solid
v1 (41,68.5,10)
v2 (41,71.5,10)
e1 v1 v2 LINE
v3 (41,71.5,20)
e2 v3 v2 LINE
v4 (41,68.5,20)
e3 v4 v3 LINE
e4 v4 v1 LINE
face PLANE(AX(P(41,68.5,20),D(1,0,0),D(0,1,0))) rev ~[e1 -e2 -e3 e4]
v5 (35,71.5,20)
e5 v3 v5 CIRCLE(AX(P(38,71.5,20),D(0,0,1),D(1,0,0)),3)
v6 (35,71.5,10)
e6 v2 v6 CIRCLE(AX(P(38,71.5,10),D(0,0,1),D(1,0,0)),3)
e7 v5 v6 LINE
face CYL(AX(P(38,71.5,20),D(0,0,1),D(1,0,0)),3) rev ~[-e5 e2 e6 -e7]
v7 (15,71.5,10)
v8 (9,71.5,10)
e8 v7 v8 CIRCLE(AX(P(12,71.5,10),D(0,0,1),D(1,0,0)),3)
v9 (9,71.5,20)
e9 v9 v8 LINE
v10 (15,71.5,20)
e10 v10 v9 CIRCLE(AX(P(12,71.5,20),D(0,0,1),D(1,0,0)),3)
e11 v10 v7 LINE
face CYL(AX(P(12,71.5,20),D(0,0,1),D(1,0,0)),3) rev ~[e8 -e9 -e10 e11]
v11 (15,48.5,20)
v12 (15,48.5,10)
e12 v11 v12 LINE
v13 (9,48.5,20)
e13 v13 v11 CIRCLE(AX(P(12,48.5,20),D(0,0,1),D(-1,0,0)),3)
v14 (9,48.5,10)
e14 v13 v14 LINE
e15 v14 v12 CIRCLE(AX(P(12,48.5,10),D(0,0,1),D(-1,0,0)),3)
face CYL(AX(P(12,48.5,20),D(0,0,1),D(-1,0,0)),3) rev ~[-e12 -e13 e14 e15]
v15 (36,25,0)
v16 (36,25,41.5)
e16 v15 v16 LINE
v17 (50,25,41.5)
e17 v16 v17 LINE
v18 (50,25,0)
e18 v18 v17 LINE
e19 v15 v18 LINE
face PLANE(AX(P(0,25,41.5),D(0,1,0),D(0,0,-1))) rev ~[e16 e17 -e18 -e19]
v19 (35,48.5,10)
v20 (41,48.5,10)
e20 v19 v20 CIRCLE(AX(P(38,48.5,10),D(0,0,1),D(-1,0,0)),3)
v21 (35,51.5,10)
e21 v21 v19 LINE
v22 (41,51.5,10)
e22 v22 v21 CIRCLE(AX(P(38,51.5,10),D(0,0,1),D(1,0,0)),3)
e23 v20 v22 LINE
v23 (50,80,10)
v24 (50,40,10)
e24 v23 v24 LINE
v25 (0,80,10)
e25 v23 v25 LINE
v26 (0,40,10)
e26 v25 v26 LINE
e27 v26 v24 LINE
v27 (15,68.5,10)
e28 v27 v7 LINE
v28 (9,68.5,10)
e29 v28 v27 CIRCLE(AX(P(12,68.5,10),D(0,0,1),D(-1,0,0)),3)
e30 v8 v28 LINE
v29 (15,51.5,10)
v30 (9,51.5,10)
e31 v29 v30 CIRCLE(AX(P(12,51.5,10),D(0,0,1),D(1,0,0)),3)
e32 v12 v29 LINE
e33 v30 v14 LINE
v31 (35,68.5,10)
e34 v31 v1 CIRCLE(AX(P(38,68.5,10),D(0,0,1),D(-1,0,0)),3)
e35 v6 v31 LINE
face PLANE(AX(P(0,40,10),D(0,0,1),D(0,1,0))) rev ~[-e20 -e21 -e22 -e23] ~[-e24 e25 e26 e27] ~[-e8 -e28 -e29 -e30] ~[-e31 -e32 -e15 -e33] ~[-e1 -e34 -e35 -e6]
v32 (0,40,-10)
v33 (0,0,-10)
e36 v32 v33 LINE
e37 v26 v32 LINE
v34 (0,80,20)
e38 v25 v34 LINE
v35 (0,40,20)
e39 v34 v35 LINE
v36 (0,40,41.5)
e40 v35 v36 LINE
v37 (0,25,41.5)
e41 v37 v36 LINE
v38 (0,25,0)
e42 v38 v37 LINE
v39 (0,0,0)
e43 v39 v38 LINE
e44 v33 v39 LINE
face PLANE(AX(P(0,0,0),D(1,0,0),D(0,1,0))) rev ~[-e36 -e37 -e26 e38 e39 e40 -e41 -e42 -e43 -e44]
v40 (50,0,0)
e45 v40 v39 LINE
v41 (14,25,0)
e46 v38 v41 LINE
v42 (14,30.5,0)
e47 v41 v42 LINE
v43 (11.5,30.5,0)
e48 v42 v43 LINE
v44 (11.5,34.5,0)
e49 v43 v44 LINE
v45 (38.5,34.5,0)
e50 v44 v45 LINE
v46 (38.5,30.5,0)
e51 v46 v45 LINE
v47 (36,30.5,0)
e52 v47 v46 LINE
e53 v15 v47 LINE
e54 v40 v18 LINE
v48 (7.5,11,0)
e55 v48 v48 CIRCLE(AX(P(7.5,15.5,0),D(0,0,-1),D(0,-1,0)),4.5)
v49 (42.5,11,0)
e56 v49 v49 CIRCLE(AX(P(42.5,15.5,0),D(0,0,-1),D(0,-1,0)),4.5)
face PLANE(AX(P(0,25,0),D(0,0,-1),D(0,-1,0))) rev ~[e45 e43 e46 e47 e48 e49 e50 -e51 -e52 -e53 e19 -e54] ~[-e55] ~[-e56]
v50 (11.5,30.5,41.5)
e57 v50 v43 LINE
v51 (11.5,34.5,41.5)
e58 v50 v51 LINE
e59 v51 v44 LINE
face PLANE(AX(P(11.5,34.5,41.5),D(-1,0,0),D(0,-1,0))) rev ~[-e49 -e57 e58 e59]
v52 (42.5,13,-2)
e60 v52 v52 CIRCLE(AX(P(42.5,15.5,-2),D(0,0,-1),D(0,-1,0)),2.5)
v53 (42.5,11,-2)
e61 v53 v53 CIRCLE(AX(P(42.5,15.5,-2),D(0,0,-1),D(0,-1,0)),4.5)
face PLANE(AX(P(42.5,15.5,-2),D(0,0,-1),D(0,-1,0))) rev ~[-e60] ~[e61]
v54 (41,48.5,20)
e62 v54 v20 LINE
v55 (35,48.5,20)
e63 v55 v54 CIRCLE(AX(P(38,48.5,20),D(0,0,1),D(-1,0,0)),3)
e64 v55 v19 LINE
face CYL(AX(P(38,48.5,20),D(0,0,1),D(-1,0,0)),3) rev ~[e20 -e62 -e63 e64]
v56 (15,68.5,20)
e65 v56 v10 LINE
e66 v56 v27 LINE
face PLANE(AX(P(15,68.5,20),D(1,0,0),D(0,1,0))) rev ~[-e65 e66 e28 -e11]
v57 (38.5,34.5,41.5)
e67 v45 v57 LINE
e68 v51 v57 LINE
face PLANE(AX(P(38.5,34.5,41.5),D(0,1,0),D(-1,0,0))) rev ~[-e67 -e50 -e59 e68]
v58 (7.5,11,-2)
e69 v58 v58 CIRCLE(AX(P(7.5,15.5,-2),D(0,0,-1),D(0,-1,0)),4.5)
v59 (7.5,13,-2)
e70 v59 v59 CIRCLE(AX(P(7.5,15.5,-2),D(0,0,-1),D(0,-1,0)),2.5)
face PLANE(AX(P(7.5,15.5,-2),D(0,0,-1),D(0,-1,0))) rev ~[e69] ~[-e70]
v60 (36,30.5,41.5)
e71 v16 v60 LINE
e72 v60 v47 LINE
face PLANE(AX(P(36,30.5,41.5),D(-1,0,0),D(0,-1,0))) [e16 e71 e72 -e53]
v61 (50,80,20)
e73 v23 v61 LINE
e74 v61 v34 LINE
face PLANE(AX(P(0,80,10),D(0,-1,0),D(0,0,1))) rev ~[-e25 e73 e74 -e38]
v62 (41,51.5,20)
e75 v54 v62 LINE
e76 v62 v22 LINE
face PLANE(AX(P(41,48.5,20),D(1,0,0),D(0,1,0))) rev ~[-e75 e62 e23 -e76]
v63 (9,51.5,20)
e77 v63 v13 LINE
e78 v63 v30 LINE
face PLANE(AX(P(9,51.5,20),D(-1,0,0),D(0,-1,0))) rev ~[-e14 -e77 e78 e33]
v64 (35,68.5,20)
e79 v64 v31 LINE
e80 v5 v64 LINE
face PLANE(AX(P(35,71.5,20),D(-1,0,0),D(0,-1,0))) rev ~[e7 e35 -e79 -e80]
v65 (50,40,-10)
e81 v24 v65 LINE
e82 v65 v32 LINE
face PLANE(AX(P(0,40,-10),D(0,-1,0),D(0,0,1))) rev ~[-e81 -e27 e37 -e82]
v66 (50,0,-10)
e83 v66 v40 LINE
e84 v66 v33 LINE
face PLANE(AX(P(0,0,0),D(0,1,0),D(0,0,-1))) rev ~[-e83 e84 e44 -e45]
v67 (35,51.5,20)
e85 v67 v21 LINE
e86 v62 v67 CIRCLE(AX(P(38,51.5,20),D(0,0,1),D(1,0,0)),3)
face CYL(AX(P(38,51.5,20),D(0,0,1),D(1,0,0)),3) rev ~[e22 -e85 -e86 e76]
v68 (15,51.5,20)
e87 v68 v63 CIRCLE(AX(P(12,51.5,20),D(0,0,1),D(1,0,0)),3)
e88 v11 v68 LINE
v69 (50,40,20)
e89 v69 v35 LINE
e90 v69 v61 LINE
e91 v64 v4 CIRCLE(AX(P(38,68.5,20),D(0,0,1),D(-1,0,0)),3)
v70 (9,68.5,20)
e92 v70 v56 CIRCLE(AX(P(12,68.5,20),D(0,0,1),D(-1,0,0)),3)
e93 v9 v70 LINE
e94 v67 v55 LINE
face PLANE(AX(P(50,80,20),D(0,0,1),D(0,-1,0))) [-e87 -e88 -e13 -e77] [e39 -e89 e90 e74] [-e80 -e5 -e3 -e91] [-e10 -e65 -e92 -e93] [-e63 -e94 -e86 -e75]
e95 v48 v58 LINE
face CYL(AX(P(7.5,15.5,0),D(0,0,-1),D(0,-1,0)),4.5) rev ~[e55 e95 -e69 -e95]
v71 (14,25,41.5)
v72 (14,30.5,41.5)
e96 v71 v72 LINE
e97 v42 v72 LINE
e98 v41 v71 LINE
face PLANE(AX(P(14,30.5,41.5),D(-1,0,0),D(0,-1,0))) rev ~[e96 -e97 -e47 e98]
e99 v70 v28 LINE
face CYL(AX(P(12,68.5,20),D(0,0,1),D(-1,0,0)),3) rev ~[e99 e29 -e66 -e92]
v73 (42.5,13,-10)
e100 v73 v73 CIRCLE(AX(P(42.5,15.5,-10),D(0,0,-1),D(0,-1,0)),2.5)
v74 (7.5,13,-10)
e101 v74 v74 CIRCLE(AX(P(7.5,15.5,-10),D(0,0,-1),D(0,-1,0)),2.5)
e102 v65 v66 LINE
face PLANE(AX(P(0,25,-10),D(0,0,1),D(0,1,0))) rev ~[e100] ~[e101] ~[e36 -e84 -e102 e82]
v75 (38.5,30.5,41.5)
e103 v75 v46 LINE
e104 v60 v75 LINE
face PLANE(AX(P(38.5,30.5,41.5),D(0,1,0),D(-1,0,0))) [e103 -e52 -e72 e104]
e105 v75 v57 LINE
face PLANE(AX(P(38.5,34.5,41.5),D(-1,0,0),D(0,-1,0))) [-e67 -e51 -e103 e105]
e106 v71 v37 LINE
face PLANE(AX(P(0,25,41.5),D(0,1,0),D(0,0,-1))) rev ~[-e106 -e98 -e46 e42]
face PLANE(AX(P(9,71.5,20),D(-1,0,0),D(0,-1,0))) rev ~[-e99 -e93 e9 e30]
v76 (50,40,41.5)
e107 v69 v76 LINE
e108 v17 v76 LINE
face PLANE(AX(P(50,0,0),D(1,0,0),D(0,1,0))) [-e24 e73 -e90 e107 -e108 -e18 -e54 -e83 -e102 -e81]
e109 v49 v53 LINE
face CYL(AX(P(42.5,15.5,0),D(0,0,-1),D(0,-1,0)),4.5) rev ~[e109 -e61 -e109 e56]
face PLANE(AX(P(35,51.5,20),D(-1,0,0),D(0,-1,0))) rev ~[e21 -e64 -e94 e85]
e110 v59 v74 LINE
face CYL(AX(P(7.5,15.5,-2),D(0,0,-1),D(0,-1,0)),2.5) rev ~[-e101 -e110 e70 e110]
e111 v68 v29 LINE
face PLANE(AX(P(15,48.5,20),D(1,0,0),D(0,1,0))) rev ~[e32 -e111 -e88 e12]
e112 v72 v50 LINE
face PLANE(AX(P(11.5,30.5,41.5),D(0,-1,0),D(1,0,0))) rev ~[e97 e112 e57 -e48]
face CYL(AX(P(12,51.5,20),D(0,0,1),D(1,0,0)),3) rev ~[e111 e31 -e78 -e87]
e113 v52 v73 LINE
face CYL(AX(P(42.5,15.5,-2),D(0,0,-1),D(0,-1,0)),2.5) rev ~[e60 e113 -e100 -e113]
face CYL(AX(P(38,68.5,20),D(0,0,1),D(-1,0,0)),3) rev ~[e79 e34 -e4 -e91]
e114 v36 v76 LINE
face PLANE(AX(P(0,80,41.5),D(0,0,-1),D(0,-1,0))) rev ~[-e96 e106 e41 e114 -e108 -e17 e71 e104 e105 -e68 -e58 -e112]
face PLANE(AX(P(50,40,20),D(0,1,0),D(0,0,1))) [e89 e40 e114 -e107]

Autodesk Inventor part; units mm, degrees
ref_plane "YZ Plane" through (0, 0, 0) normal (1, 0, 0) x (0, 1, 0)
ref_plane "XZ Plane" through (0, 0, 0) normal (0, 1, 0) x (-1, 0, 0)
sketch "Sketch1" plane through (0, 0, 0) normal (1, 0, 0) x (0, 1, 0)
  line L0 (80, 41.5) -> (25, 41.5)
  line L1 (25, 41.5) -> (25, -10)
  line L2 (25, -10) -> (80, -10)
  line L3 (80, -10) -> (80, 41.5)
  line L4 (25, 0) -> (0, 0)
  line L5 (0, 0) -> (0, -10)
  line L6 (0, -10) -> (25, -10)
  line L7 (25, -10) -> (25, 0)
  line L8 (40, 10) -> (80, 10)
  line L9 (80, 10) -> (80, -10)
  line L10 (80, -10) -> (40, -10)
  line L11 (40, -10) -> (40, 10)
  point P0 (25, -10)
  dimension "d0" = 55
  dimension "d1" = 10
  dimension "d3" = 51.5
  dimension "d135" = 25
  dimension "d144" = 20
  dimension "d145" = 40
extrude "Extrusion1" add sketch "Sketch1" along normal blind 50 contours L3 L8 L11 L2 L1 L0 | L1 L6 L5 L4
ref_plane "Work Plane1" through (0, 25, 8.75) normal (0, 0, 1) x (1, 0, 0)
sketch "Sketch23" plane through (0, 25, 41.5) normal (0, 0, 1) x (1, 0, 0)
  line L0 (38.5, 9.5) -> (11.5, 9.5)
  line L1 (0, 0) -> (50, 0) projected
  line L2 (38.5, 9.5) -> (38.5, 5.5)
  line L3 (38.5, 5.5) -> (36, 5.5)
  line L4 (36, 5.5) -> (36, 0)
  line L5 (0, 0) -> (50, 0) projected
  line L6 (11.5, 9.5) -> (11.5, 5.5)
  line L7 (11.5, 5.5) -> (14, 5.5)
  line L8 (14, 5.5) -> (14, 0)
  point P0 (0, -25)
  point P1 (25, 9.5)
  point P2 (25, 0)
  point P3 (14, 0)
  point P4 (36, 0)
  dimension "d149" = 9.5
  dimension "d150" = 4
  dimension "d151" = 2.5
  dimension "d152" = 27
extrude "Extrusion16" cut sketch "Sketch23" against normal up to surface (41.5 mm away)
sketch "Sketch24" plane through (50, 0, 0) normal (1, 0, 0) x (0, 0, -1)
  line L0 (-20, 45) -> (-41.5, 45)
  line L1 (-41.5, 45) -> (-41.5, 80)
  line L2 (-41.5, 80) -> (-20, 80)
  line L3 (-20, 80) -> (-20, 45)
  line L4 (-10, 40) -> (-10, 80) projected
  line L5 (10, 40) -> (-10, 40) projected
  line L6 (-41.5, 80) -> (-41.5, 25) projected
  line L7 (-10, 80) -> (-41.5, 80) projected
  point P0 (0, 0)
  dimension "d155" = 10
  dimension "d156" = 5
extrude "Extrusion17" cut sketch "Sketch24" against normal through all
sketch "Sketch25" plane through (0, 0, 0) normal (0, 0, 1) x (1, 0, 0)
  circle A0 centre (7.5, 15.5) radius 2.5
  circle A1 centre (42.5, 15.5) radius 2.5
  line L0 (0, 0) -> (50, 0) projected
  line L1 (50, 25) -> (50, 0) projected
  dimension "d162" = 5
  dimension "d163" = 15.5
  dimension "d164" = 7.5
  dimension "d165" = 35
hole "Hole5" at (7.5, 15.5, 0) at (42.5, 15.5, 0) direction (0, 0, -1) diameter 5 end through all counterbore diameter 9 counterbore depth 2
move faces "Move6" translate (0, -5, 0) faces at (33.3333, 45, 34.3333)
sketch "Sketch26" plane through (0, 80, 20) normal (0, 0, 1) x (1, 0, 0)
  line L0 (38, -31.5) -> (38, -28.5) construction
  line L1 (41, -31.5) -> (41, -28.5)
  line L2 (35, -28.5) -> (35, -31.5)
  arc A0 (35, -31.5) -> (41, -31.5) centre (38, -31.5) ccw
  arc A1 (41, -28.5) -> (35, -28.5) centre (38, -28.5) ccw
  line L3 (12, -31.5) -> (12, -28.5) construction
  line L4 (15, -31.5) -> (15, -28.5)
  line L5 (9, -28.5) -> (9, -31.5)
  arc A2 (9, -31.5) -> (15, -31.5) centre (12, -31.5) ccw
  arc A3 (15, -28.5) -> (9, -28.5) centre (12, -28.5) ccw
  line L6 (38, -11.5) -> (38, -8.5) construction
  line L7 (41, -11.5) -> (41, -8.5)
  line L8 (35, -8.5) -> (35, -11.5)
  arc A4 (35, -11.5) -> (41, -11.5) centre (38, -11.5) ccw
  arc A5 (41, -8.5) -> (35, -8.5) centre (38, -8.5) ccw
  line L9 (12, -11.5) -> (12, -8.5) construction
  line L10 (15, -11.5) -> (15, -8.5)
  line L11 (9, -8.5) -> (9, -11.5)
  arc A6 (9, -11.5) -> (15, -11.5) centre (12, -11.5) ccw
  arc A7 (15, -8.5) -> (9, -8.5) centre (12, -8.5) ccw
  line L12 (50, 0) -> (50, -35) projected
  line L13 (0, -35) -> (0, 0) projected
  line L14 (0, 0) -> (50, 0) projected
  line L15 (50, -40) -> (0, -40) projected
  point P0 (0, -80)
  point P1 (38, -30)
  point P2 (12, -30)
  point P3 (38, -10)
  point P4 (12, -10)
  dimension "d173" = 3
  dimension "d174" = 6
  dimension "d176" = 12
  dimension "d177" = 12
  dimension "d178" = 10
  dimension "d185" = 10
extrude "Extrusion18" cut sketch "Sketch26" against normal through all
equation "\"d177\" = d176"
equation "\"d178\" = d175"
equation "\"d175\" = 10"
properties part number "10-03-029"
